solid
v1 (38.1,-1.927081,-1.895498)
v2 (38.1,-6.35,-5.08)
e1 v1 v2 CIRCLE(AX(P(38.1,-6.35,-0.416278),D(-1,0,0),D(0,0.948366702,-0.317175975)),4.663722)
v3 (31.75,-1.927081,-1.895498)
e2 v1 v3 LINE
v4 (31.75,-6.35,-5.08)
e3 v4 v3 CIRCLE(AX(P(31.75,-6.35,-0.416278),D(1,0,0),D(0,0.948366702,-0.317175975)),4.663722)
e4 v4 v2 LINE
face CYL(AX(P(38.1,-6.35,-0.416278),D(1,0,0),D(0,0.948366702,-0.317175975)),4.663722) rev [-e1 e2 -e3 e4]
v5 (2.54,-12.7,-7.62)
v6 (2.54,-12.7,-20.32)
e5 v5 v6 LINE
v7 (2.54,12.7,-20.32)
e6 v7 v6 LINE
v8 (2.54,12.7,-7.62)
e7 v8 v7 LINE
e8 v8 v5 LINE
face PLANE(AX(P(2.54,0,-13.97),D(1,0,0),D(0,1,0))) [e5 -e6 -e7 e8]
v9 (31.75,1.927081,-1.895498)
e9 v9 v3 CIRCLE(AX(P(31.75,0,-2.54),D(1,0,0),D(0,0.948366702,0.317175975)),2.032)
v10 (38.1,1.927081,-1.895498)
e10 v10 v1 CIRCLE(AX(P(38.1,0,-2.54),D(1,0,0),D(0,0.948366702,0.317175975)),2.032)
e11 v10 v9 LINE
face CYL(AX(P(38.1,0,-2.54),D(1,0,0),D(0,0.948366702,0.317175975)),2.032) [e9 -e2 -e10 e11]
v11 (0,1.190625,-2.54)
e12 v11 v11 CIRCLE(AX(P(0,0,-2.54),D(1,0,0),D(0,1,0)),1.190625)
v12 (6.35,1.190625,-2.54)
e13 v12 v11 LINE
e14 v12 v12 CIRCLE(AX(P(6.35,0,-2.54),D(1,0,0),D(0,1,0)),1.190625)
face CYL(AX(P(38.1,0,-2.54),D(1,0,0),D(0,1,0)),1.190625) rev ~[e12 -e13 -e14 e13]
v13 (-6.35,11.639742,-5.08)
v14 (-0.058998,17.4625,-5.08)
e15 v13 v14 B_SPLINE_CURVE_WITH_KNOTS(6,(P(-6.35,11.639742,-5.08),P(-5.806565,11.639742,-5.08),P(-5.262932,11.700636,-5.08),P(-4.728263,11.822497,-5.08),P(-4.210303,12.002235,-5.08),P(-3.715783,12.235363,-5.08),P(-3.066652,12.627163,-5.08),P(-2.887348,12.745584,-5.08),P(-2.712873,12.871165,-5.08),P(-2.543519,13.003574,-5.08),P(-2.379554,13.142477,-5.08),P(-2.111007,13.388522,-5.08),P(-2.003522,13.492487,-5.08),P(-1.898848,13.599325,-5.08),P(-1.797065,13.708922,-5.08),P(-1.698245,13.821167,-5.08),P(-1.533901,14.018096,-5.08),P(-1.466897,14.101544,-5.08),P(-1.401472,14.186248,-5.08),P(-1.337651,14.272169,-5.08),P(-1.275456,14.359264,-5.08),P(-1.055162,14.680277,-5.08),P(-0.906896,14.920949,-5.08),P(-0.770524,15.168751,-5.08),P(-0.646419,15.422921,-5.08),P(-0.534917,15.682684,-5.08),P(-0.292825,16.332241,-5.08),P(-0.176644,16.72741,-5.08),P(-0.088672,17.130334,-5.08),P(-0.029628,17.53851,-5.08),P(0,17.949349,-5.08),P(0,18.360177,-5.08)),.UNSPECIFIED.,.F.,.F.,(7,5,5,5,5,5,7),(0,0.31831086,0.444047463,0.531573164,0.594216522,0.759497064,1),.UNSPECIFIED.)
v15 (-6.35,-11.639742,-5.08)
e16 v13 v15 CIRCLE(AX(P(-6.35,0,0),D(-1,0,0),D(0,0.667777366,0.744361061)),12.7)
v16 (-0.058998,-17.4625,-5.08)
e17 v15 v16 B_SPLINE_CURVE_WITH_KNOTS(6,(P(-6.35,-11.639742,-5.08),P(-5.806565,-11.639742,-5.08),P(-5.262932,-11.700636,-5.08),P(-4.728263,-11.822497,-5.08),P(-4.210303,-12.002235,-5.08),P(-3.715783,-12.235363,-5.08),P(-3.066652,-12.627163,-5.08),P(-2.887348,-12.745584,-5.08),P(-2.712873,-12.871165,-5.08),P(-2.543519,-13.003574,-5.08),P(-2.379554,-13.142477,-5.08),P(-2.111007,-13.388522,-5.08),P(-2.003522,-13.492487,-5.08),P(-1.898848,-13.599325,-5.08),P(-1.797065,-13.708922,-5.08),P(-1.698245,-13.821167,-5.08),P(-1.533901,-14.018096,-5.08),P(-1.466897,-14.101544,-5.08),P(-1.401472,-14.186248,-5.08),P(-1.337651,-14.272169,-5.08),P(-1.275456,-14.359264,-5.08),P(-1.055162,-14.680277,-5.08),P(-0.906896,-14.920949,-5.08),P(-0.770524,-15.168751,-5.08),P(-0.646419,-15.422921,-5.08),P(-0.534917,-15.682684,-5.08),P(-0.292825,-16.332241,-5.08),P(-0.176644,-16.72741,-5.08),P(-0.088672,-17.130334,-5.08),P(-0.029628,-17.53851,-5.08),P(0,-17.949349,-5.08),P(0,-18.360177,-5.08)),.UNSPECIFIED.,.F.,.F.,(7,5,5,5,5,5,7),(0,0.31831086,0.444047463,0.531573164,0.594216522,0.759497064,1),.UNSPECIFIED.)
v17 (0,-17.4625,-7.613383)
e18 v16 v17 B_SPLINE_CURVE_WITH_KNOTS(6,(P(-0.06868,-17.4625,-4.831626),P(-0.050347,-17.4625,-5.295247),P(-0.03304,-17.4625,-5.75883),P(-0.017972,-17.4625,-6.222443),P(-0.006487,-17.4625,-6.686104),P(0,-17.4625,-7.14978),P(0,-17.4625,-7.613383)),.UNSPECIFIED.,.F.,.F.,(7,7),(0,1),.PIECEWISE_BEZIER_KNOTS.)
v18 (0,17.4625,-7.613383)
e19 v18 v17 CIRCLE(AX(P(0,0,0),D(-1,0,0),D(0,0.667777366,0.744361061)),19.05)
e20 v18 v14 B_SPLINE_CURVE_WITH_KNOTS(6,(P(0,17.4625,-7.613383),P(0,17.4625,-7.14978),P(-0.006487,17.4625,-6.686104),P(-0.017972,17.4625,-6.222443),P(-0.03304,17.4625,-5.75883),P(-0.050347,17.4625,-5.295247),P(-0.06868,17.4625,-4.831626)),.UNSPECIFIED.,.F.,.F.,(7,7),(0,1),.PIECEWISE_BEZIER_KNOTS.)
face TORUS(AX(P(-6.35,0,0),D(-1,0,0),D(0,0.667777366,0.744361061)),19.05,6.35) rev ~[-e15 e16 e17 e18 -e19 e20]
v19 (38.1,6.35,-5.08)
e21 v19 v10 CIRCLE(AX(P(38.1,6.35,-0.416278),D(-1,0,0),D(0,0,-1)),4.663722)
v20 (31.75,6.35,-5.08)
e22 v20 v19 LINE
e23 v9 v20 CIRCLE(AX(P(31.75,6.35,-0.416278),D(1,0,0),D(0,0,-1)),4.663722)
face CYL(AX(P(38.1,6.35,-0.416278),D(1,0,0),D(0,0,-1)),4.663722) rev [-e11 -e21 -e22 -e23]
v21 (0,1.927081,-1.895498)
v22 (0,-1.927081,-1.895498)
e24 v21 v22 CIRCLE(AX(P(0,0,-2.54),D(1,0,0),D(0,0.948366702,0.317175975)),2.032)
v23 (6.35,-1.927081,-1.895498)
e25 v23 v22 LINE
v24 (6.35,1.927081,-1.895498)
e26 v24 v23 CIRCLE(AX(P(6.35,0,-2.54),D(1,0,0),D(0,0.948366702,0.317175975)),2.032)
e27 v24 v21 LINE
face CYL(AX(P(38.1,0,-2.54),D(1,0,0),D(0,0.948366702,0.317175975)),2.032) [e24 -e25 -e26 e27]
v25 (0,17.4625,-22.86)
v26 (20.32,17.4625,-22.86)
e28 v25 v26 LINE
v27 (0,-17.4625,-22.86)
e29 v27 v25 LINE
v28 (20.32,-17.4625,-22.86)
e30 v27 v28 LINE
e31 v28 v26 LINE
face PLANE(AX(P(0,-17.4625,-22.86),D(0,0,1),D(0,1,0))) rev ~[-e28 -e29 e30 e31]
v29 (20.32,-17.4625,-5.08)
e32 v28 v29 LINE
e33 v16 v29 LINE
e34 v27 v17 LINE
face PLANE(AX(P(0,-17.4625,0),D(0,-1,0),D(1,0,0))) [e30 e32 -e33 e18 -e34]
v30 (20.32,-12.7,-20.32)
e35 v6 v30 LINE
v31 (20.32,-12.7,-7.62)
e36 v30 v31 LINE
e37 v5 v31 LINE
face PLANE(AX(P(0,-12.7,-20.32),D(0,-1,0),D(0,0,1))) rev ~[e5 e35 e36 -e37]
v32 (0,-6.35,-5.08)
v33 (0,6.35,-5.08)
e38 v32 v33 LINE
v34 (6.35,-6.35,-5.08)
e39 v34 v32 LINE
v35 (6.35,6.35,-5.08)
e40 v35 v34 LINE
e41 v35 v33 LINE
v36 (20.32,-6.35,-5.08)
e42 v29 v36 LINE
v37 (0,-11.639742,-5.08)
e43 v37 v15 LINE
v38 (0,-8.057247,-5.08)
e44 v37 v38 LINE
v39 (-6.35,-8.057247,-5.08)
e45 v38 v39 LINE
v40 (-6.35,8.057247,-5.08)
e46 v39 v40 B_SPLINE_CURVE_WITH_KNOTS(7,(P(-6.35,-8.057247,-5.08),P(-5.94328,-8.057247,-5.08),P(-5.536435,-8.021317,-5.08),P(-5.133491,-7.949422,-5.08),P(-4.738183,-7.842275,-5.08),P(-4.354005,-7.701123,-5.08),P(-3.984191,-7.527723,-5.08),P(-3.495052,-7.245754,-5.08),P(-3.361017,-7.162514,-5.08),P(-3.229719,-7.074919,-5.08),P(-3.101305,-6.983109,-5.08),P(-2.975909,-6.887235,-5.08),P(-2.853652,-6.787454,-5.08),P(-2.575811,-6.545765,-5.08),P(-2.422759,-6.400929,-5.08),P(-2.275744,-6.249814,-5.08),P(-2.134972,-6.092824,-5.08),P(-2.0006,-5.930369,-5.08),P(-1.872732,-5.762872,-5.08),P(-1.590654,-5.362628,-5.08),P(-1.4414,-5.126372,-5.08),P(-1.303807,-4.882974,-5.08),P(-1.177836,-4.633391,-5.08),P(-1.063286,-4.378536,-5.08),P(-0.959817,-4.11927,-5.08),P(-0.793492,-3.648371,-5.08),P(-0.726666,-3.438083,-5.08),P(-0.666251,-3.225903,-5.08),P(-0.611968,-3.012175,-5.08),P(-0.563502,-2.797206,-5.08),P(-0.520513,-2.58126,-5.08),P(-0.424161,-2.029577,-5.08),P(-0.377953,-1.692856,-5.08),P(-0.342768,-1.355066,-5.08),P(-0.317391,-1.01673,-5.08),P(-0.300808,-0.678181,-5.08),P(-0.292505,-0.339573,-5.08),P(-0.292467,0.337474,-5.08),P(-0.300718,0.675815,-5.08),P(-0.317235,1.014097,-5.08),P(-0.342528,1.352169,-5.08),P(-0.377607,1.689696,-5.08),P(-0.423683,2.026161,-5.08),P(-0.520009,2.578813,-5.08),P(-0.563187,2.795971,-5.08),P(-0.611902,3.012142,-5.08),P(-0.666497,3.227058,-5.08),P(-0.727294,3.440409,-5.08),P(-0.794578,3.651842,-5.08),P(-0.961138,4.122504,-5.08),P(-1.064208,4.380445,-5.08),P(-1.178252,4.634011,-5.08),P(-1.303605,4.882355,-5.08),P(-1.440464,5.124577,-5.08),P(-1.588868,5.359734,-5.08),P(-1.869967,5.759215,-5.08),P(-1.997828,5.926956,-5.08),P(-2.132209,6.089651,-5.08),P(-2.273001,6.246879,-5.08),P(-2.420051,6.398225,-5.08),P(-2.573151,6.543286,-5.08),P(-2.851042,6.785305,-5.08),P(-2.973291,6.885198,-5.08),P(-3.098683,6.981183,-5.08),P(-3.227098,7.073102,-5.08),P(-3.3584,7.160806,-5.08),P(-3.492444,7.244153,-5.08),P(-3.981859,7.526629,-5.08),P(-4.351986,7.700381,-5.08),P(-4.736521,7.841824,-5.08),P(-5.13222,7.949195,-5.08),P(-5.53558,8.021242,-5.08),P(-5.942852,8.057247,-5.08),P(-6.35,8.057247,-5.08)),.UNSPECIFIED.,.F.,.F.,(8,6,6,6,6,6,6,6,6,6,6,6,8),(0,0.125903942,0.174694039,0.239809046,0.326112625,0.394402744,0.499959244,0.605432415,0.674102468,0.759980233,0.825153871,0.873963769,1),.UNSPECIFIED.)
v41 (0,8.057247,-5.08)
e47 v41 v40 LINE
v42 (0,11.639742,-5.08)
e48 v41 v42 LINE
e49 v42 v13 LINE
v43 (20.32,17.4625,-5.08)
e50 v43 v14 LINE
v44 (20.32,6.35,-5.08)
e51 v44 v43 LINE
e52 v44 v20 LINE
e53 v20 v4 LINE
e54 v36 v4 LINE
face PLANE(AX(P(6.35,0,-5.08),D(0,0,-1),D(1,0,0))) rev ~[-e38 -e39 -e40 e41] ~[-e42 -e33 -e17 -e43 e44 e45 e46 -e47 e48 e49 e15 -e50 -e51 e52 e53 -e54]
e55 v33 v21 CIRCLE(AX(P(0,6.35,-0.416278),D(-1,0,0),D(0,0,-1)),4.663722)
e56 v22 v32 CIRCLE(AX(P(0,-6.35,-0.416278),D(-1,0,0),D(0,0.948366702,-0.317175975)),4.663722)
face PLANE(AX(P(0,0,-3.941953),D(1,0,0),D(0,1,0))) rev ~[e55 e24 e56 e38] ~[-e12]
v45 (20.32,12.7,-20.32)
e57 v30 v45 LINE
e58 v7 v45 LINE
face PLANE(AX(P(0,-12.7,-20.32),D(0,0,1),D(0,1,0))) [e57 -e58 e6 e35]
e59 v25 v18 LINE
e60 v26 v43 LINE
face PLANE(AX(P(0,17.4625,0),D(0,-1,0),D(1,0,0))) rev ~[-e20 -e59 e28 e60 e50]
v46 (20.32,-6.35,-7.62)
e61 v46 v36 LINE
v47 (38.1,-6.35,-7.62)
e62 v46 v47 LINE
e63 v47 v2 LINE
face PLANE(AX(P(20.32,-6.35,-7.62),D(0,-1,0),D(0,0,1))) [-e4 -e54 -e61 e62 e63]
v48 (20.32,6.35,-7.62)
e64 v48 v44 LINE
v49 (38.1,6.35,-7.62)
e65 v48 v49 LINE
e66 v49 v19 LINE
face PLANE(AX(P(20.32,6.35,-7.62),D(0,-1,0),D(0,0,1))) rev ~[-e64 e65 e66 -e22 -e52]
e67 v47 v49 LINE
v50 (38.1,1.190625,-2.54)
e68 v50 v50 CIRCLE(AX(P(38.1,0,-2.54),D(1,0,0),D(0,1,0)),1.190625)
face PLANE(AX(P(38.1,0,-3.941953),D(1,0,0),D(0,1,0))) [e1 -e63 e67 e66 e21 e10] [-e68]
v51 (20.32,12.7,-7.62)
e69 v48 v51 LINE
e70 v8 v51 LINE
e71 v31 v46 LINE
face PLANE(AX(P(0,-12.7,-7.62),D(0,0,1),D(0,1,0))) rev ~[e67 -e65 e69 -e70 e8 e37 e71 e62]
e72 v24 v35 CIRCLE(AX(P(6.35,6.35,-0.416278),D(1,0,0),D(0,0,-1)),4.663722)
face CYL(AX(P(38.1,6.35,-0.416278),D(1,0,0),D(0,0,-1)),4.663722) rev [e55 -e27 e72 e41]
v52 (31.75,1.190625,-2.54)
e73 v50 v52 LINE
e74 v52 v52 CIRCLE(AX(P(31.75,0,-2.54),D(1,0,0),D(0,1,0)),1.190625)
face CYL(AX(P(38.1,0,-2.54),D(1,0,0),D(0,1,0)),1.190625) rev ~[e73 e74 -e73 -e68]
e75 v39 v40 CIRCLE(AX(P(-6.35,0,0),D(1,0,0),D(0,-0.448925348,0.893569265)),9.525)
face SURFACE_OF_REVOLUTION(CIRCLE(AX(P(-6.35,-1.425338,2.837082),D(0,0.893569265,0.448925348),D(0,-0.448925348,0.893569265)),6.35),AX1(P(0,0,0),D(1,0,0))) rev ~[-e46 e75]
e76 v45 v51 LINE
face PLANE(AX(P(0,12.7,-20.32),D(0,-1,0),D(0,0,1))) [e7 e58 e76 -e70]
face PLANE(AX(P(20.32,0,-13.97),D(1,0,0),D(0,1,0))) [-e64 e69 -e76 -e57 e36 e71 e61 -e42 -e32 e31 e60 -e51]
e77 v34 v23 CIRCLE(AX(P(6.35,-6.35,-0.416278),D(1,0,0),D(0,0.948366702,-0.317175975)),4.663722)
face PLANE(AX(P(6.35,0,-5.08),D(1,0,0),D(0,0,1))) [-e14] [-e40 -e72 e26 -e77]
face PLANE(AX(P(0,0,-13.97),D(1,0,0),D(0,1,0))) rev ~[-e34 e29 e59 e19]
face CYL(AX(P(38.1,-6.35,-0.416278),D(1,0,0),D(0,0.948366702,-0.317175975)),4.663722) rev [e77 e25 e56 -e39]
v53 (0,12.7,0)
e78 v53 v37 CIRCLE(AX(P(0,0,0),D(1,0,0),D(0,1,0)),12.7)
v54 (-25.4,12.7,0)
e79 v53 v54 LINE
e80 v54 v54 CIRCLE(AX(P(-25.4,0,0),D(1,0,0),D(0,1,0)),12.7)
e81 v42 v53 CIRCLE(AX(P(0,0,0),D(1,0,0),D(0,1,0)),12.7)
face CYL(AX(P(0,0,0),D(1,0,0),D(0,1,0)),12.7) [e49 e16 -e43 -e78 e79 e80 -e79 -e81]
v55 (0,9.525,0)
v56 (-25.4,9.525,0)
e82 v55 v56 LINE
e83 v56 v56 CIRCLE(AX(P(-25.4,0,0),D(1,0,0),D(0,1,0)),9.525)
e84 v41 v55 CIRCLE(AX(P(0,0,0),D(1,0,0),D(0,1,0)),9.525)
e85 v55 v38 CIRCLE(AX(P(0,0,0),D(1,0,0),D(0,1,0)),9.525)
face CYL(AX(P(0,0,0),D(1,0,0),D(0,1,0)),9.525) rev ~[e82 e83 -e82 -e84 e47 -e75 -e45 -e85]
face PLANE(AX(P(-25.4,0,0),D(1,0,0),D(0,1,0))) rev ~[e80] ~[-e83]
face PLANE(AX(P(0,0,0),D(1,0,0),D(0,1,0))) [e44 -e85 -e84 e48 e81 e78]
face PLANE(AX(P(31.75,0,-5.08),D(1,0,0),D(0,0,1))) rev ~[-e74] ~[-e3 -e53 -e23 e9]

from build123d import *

# Parameters (mm, degrees)
F0_R        = 12.7
F0_R_2      = 9.525
F1_DEPTH    = 25.4
F2_W        = 34.925
F2_H        = 17.78
F2_W_2      = 25.4
F2_H_2      = 12.7
F3_DEPTH    = 2.54
F4_DEPTH    = 20.32
F5_T4_ANGLE = 306.6504874214
F5_T9_ANGLE = 276.2084965167
F6_W        = 12.7
F6_H        = 2.54
F7_DEPTH    = 17.78
F8_R        = 1.190625
F9_DEPTH    = 38.1
F10_W       = 25.4
F10_H       = 5.08
F11_DEPTH   = 12.7


# Not quite as in the source:
# - a fillet or chamfer that OpenCascade refuses, or shapes differently, is made with other operations: its cross-section is extruded or revolved along the edge and cut away or added


with BuildPart() as f1:
    # F0 (on Right) → F1 (new body)
    with BuildSketch(Plane.YZ):
        Circle(F0_R)
        Circle(F0_R_2, mode=Mode.SUBTRACT)
    extrude(amount=-F1_DEPTH)

    # F2 (on Right) → F3 (join)
    with BuildSketch(Plane.YZ):
        with Locations((0, -13.97)):
            Rectangle(F2_W, F2_H)
        with Locations((0, -13.97)):
            Rectangle(F2_W_2, F2_H_2, mode=Mode.SUBTRACT)
        with Locations((0, -13.97)):
            Rectangle(F2_W_2, F2_H_2)
    extrude(amount=F3_DEPTH)

    # F2 (on Right) → F4 (join)
    with BuildSketch(Plane.YZ):
        with Locations((0, -13.97)):
            Rectangle(F2_W, F2_H)
        with Locations((0, -13.97)):
            Rectangle(F2_W_2, F2_H_2, mode=Mode.SUBTRACT)
    extrude(amount=F4_DEPTH)

    # F5: fillet of radius 6.35 on 2 edges, made by hand


with BuildPart() as f5_tool2:
    # F5_s3 → F5_t4 (revolve)
    with BuildSketch(Plane(origin=(0, 0, 0), x_dir=(1, 0, 0), z_dir=(0, 0.8935692652, 0.4489253482))):
        with BuildLine():
            ThreePointArc((-6.35, -9.525), (-1.8598719395, -7.6651280605), (0, -3.175))
            Line((0, -3.175), (0, -9.525))
            Line((0, -9.525), (-6.35, -9.525))
        make_face()
    revolve(axis=Axis((0, 0, 0), (1, 0, 0)), revolution_arc=F5_T4_ANGLE)

    split(bisect_by=Plane.XY.offset(-5.08), keep=Keep.BOTTOM)


with BuildPart() as f1_1:
    add(f1.part)

    # F5_t1: union F5_tool2
    add(f5_tool2.part)


with BuildPart() as f5_tool7:
    # F5_s8 → F5_t9 (revolve)
    with BuildSketch(Plane(origin=(0, 0, 0), x_dir=(1, 0, 0), z_dir=(0, -0.7443610614, 0.6677773658))):
        with BuildLine():
            ThreePointArc((-6.35, 12.7), (-1.8598719395, 14.5598719395), (0, 19.05))
            Line((0, 19.05), (0, 12.7))
            Line((0, 12.7), (-6.35, 12.7))
        make_face()
    revolve(axis=Axis((0, 0, 0), (-1, 0, 0)), revolution_arc=F5_T9_ANGLE)

    split(bisect_by=Plane.XY.offset(-5.08), keep=Keep.BOTTOM)

    split(bisect_by=Plane.XZ.offset(17.4625), keep=Keep.BOTTOM)

    split(bisect_by=Plane.XZ.offset(-17.4625), keep=Keep.TOP)


with BuildPart() as f1_2:
    add(f1_1.part)

    # F5_t6: union F5_tool7
    add(f5_tool7.part)

    # F6 (on face) → F7 (join)
    with BuildSketch(Plane.YZ.offset(20.32)):
        with Locations((0, -6.35)):
            Rectangle(F6_W, F6_H)
    extrude(amount=F7_DEPTH)

    # F8 (on face) → F9 (join)
    with BuildSketch(Plane.YZ.offset(38.1)):
        with BuildLine():
            ThreePointArc((1.927081138, -1.8954984194), (0, -0.508), (-1.927081138, -1.8954984194))
            ThreePointArc((-1.927081138, -1.8954984194), (-3.6249650655, -4.2010485201), (-6.35, -5.08))
            Line((-6.35, -5.08), (6.35, -5.08))
            ThreePointArc((6.35, -5.08), (3.6249650655, -4.2010485201), (1.927081138, -1.8954984194))
        make_face()
        with Locations((0, -2.54)):
            Circle(F8_R, mode=Mode.SUBTRACT)
    extrude(amount=-F9_DEPTH)

    # F10 (on Front) → F11 (cut, symmetric)
    with BuildSketch(Plane.XZ):
        with Locations((19.05, -2.54)):
            Rectangle(F10_W, F10_H)
    extrude(amount=F11_DEPTH, both=True, mode=Mode.SUBTRACT)


solid = f1_2.part
